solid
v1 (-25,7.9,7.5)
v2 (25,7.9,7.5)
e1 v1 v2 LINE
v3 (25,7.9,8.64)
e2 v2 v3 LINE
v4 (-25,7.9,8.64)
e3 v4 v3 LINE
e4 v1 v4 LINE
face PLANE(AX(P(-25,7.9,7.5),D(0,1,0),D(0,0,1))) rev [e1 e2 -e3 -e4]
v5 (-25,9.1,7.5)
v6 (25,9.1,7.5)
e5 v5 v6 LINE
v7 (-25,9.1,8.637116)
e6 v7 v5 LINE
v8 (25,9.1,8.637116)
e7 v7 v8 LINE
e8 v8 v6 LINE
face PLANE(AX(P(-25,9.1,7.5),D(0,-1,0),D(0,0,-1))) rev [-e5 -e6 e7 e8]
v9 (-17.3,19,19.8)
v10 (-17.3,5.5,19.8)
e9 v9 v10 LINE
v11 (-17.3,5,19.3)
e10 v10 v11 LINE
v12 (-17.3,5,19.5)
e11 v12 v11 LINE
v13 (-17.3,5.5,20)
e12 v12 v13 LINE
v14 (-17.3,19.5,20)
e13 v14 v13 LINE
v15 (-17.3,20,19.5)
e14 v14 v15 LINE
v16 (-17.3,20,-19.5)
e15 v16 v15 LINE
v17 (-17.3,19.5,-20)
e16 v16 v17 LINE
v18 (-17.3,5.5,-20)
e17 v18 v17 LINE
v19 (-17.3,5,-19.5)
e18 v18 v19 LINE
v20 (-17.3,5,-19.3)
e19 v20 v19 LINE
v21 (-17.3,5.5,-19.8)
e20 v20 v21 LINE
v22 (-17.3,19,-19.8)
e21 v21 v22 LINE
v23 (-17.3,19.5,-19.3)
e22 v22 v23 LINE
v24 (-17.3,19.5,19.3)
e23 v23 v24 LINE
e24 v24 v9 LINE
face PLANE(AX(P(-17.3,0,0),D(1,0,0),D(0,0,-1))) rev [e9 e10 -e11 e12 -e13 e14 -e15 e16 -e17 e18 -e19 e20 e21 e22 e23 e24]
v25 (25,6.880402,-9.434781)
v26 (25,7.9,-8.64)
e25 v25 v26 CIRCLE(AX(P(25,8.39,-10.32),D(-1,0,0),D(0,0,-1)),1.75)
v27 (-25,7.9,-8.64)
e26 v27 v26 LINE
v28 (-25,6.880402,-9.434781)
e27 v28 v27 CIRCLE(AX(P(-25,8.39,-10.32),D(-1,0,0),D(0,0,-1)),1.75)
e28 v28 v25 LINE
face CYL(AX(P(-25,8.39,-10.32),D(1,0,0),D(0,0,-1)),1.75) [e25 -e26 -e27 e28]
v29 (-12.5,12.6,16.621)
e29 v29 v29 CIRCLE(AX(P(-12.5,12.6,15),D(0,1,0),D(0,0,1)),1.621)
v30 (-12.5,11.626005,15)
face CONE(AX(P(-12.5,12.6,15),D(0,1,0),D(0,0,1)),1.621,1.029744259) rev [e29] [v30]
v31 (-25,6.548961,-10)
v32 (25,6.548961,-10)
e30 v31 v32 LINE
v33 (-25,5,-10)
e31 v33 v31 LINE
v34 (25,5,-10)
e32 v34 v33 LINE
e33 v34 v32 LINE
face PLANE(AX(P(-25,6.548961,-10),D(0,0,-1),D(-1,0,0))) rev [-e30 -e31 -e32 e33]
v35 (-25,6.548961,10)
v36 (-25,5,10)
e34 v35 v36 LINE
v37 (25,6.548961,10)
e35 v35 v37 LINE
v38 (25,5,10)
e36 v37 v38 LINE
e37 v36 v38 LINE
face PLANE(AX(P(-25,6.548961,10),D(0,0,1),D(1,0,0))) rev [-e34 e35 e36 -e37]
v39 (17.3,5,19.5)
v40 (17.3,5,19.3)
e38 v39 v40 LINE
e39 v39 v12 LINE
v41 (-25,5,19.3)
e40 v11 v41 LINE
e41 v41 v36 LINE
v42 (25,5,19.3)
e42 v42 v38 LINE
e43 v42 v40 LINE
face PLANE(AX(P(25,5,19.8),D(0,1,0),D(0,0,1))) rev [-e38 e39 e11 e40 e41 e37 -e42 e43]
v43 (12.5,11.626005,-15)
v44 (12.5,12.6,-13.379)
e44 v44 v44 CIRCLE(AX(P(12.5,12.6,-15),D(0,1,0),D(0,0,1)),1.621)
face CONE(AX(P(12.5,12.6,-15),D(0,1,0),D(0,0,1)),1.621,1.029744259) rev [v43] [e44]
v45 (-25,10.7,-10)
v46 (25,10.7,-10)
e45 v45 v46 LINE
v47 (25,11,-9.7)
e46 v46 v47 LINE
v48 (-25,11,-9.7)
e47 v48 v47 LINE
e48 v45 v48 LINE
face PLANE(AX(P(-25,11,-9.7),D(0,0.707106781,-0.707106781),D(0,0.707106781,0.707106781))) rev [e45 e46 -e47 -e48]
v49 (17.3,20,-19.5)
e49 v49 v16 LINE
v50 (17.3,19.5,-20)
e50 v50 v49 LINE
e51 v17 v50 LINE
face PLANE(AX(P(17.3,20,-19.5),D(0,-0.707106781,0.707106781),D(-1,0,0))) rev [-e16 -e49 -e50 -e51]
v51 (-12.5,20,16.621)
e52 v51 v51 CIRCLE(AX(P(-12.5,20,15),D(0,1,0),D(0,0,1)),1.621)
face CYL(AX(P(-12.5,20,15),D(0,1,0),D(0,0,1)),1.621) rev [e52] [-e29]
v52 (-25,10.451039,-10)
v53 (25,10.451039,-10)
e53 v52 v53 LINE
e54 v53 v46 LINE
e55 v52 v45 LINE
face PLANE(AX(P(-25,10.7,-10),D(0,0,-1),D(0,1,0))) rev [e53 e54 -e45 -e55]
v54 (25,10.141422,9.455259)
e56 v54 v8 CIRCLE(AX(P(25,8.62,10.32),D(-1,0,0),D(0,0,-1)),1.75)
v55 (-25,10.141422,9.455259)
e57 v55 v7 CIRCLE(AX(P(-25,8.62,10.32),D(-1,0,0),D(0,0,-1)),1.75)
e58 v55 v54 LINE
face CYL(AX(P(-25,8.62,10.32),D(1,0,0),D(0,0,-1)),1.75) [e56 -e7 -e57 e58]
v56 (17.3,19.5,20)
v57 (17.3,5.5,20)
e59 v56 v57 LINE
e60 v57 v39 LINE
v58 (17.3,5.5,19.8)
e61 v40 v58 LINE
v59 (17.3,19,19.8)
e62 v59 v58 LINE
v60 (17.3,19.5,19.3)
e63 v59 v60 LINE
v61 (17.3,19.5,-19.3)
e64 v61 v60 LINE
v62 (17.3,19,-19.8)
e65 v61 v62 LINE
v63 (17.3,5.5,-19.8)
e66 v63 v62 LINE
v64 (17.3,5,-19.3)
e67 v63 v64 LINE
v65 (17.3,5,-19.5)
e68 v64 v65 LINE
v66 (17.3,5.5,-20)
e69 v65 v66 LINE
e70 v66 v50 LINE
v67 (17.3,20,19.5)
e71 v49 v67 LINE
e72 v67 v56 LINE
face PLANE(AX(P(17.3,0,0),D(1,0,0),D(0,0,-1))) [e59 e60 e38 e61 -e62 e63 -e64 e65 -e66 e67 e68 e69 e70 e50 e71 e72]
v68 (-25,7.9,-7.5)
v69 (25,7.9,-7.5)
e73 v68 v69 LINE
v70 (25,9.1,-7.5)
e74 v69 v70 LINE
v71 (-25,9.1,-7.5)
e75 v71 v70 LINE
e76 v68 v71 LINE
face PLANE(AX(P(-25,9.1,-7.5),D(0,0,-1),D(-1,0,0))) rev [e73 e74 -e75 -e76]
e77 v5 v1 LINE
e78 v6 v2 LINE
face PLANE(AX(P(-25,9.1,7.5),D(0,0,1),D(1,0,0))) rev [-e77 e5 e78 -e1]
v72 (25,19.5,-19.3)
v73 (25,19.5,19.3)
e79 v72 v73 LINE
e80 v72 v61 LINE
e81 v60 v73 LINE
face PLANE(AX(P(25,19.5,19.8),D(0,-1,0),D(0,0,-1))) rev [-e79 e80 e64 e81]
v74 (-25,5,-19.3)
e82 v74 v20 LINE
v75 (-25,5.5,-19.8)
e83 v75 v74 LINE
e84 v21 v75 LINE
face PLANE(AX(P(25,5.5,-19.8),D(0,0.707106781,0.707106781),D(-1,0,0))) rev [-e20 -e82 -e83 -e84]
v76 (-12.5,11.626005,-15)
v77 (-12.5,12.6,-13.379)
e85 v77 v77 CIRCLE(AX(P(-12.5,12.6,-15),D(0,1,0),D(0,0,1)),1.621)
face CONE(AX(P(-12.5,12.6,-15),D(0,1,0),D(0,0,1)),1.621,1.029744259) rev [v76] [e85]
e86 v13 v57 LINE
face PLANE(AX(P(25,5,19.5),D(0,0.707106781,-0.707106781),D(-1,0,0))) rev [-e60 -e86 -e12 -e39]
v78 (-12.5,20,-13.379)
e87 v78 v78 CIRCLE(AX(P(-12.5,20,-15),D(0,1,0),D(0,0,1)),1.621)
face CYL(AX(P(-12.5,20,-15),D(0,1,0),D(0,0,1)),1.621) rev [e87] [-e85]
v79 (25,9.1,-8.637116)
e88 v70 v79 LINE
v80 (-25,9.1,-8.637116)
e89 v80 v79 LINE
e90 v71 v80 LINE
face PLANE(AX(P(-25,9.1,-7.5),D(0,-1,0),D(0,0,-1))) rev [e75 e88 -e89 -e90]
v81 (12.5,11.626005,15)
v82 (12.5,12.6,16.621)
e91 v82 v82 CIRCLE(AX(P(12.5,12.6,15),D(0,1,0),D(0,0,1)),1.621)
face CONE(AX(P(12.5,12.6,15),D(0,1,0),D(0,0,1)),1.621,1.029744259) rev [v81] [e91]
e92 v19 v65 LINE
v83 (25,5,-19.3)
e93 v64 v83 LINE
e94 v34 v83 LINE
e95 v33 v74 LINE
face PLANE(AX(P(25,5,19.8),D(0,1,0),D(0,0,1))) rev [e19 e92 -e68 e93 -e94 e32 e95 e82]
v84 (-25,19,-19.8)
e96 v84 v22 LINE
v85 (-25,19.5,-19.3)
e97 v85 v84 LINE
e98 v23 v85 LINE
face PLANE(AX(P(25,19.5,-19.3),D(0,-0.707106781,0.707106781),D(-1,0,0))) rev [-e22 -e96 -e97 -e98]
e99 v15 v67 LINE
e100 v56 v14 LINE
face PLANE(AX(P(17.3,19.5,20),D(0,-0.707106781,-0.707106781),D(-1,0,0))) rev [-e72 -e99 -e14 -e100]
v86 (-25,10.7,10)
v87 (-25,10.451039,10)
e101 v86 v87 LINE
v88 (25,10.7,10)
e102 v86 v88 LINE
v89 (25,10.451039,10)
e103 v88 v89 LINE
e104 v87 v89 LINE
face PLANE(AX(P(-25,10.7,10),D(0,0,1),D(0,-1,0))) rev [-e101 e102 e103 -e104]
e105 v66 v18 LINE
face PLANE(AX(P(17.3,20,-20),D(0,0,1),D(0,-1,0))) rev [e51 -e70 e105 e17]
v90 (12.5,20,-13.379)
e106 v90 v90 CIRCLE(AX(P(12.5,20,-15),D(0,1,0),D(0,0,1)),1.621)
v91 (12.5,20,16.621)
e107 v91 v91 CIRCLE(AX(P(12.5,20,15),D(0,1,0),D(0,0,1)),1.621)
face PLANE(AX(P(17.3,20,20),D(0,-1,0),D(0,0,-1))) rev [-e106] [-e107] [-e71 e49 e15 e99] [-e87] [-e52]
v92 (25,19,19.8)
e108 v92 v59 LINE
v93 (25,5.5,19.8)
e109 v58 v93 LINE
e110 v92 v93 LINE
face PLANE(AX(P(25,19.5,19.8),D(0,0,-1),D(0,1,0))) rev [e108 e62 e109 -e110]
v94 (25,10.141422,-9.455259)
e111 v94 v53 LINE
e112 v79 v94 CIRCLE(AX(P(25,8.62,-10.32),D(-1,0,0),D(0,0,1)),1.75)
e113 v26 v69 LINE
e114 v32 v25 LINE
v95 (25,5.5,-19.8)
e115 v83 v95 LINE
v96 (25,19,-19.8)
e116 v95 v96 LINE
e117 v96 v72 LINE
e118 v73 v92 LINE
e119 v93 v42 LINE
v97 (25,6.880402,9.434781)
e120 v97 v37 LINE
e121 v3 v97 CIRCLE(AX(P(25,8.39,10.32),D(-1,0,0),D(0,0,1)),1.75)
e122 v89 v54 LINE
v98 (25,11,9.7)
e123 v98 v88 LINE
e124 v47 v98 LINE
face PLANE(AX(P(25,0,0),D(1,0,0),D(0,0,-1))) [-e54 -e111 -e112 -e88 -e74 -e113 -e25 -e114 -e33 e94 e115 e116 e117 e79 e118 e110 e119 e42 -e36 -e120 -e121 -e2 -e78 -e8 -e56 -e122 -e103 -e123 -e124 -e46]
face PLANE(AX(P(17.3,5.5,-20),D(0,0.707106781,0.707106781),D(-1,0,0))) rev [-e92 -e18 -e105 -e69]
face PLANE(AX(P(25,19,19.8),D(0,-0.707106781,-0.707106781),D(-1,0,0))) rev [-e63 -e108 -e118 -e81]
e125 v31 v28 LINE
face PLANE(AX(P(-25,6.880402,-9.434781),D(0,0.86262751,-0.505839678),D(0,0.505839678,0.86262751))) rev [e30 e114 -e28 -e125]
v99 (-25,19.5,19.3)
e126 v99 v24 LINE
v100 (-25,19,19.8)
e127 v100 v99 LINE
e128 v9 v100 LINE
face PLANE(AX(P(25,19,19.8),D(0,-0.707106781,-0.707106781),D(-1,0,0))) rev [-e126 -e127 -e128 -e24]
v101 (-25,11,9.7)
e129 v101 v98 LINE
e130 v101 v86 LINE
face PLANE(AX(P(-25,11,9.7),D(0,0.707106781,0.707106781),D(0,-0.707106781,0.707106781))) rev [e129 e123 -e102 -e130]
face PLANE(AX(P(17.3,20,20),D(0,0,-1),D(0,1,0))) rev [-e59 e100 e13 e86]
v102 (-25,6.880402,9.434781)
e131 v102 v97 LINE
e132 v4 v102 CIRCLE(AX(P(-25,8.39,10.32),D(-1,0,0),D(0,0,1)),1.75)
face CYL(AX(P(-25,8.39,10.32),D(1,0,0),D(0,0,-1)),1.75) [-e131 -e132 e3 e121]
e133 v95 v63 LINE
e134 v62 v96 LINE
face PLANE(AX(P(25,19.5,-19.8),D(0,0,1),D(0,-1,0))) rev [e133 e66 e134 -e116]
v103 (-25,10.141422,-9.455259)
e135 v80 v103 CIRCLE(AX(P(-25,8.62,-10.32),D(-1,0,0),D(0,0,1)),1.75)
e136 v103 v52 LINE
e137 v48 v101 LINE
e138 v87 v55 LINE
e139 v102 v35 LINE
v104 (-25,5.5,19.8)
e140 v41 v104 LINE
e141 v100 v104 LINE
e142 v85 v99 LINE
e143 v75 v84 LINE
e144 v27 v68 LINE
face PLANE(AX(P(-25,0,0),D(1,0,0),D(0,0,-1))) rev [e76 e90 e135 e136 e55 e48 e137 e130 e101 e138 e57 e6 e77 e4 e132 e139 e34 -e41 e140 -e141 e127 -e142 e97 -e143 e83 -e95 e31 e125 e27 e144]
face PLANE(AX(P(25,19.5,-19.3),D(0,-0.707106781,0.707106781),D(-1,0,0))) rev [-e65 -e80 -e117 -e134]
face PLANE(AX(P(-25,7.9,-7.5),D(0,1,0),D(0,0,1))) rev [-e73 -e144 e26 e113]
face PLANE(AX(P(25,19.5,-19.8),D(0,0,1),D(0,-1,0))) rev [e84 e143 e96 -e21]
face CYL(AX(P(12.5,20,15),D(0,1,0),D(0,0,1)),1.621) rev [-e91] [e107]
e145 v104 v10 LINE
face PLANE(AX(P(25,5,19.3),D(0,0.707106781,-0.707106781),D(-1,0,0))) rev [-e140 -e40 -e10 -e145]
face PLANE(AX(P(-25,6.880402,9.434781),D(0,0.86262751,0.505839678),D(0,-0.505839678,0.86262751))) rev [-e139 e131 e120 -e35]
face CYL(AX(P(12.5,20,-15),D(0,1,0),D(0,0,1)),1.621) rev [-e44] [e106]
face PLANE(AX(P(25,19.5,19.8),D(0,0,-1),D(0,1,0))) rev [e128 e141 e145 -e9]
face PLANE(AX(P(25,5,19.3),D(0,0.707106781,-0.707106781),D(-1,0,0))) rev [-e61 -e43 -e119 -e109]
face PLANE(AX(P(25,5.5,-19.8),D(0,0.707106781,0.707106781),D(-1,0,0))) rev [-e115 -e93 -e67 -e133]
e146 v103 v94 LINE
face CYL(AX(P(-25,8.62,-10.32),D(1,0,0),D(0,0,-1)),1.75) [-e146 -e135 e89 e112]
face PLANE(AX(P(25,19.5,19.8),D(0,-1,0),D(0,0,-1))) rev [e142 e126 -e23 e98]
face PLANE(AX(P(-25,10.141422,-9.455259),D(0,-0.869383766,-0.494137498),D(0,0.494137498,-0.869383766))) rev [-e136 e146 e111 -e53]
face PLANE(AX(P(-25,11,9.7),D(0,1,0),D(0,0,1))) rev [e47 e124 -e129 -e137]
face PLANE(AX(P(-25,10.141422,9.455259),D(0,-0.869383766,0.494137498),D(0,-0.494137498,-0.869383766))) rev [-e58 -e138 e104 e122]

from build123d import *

# Parameters (mm, degrees)
SKETCH1_W               = 39.6
SKETCH1_H               = 14.5
BOSS_EXTRUDE1_DEPTH     = 25
SKETCH2_W               = 40
SKETCH2_H               = 15
BOSS_EXTRUDE2_DEPTH     = 17.3
CUT_EXTRUDE2_DEPTH      = 38.749172176
CUT_EXTRUDE2_DEPTH_BACK = 38.749172176
CHAMFER1_SIZE           = 0.5
CHAMFER2_SIZE           = 0.5
CHAMFER3_SIZE           = 0.5
CHAMFER4_SIZE           = 0.5
LPATTERN2_COUNT         = 2
LPATTERN2_PITCH         = 25
LPATTERN2_COUNT_DIR2    = 2
LPATTERN2_PITCH_DIR2    = 30


with BuildPart() as part:
    # Sketch1 → Boss-Extrude1 (new, symmetric)
    with BuildSketch(Plane(origin=(0, 0, 0), x_dir=(0, 0, -1), z_dir=(1, 0, 0))):
        with Locations((0, 12.25)):
            Rectangle(SKETCH1_W, SKETCH1_H)
    extrude(amount=BOSS_EXTRUDE1_DEPTH, both=True)

    # Sketch2 → Boss-Extrude2 (add, symmetric)
    with BuildSketch(Plane(origin=(0, 0, 0), x_dir=(0, 0, -1), z_dir=(1, 0, 0))):
        with Locations((0, 12.5)):
            Rectangle(SKETCH2_W, SKETCH2_H)
    extrude(amount=BOSS_EXTRUDE2_DEPTH, both=True)

    # Sketch4 → Cut-Extrude2 (cut, two sides: drawn at the far end of the back side and taken through both)
    with BuildSketch(Plane(origin=(0, 0, 0), x_dir=(0, 0, -1), z_dir=(1, 0, 0)).offset(-CUT_EXTRUDE2_DEPTH_BACK)):
        with BuildLine():
            Line((-9.7, 11), (9.7, 11))
            Line((9.7, 11), (10, 10.7))
            Line((10, 10.7), (10, 10.451039482))
            Line((10, 10.451039482), (9.455259378, 10.141421591))
            ThreePointArc((9.455259378, 10.141421591), (8.943868436, 9.701092928), (8.637115571, 9.1))
            Line((8.637115571, 9.1), (7.5, 9.1))
            Line((7.5, 9.1), (7.5, 7.9))
            Line((7.5, 7.9), (8.64, 7.9))
            ThreePointArc((8.64, 7.9), (8.939788863, 7.314120259), (9.434780564, 6.880401858))
            Line((9.434780564, 6.880401858), (10, 6.548960518))
            Line((10, 6.548960518), (10, 0))
            Line((10, 0), (-10, 0))
            Line((-10, 0), (-10, 6.548960518))
            Line((-10, 6.548960518), (-9.434780564, 6.880401858))
            ThreePointArc((-9.434780564, 6.880401858), (-8.939788863, 7.314120259), (-8.64, 7.9))
            Line((-8.64, 7.9), (-7.5, 7.9))
            Line((-7.5, 7.9), (-7.5, 9.1))
            Line((-7.5, 9.1), (-8.637115571, 9.1))
            ThreePointArc((-8.637115571, 9.1), (-8.943868436, 9.701092928), (-9.455259378, 10.141421591))
            Line((-9.455259378, 10.141421591), (-10, 10.451039482))
            Line((-10, 10.451039482), (-10, 10.7))
            Line((-10, 10.7), (-9.7, 11))
        make_face()
    extrude(amount=CUT_EXTRUDE2_DEPTH + CUT_EXTRUDE2_DEPTH_BACK, mode=Mode.SUBTRACT)

    # Chamfer1
    chamfer1_edges = [part.edges().sort_by_distance(p)[0] for p in [
        (-21.15, 19.5, 19.8),
        (-21.15, 19.5, -19.8),
        (21.15, 19.5, 19.8),
        (21.15, 19.5, -19.8),
    ]]
    chamfer(chamfer1_edges, length=CHAMFER1_SIZE)

    # Chamfer2
    chamfer2_edges = [part.edges().sort_by_distance(p)[0] for p in [
        (0, 20, 20),
        (0, 20, -20),
    ]]
    chamfer(chamfer2_edges, length=CHAMFER2_SIZE)

    # Chamfer3
    chamfer3_edges = [part.edges().sort_by_distance(p)[0] for p in [
        (-21.15, 5, -19.8),
        (-21.15, 5, 19.8),
        (21.15, 5, -19.8),
        (21.15, 5, 19.8),
    ]]
    chamfer(chamfer3_edges, length=CHAMFER3_SIZE)

    # Chamfer4
    chamfer4_edges = [part.edges().sort_by_distance(p)[0] for p in [
        (0, 5, 20),
        (0, 5, -20),
    ]]
    chamfer(chamfer4_edges, length=CHAMFER4_SIZE)

    # Sketch7 → Tap2 (revolve, cut)
    with BuildSketch(Plane(origin=(-12.5, 20, -15), x_dir=(0, 0, 1), z_dir=(1, 0, 0))):
        Polygon((0, 0), (0, 8.373995063), (1.621, 7.4), (1.621, 0), align=None)
    tap2 = revolve(axis=Axis((-12.5, 20, -15), (0, -1, 0)), mode=Mode.SUBTRACT)

    # LPattern2: Tap2 2 × 2
    with Locations(*[(i * LPATTERN2_PITCH, 0, j * LPATTERN2_PITCH_DIR2) for i in range(LPATTERN2_COUNT) for j in range(LPATTERN2_COUNT_DIR2) if (i, j) != (0, 0)]):
        add(tap2, mode=Mode.SUBTRACT)


solid = part.part
